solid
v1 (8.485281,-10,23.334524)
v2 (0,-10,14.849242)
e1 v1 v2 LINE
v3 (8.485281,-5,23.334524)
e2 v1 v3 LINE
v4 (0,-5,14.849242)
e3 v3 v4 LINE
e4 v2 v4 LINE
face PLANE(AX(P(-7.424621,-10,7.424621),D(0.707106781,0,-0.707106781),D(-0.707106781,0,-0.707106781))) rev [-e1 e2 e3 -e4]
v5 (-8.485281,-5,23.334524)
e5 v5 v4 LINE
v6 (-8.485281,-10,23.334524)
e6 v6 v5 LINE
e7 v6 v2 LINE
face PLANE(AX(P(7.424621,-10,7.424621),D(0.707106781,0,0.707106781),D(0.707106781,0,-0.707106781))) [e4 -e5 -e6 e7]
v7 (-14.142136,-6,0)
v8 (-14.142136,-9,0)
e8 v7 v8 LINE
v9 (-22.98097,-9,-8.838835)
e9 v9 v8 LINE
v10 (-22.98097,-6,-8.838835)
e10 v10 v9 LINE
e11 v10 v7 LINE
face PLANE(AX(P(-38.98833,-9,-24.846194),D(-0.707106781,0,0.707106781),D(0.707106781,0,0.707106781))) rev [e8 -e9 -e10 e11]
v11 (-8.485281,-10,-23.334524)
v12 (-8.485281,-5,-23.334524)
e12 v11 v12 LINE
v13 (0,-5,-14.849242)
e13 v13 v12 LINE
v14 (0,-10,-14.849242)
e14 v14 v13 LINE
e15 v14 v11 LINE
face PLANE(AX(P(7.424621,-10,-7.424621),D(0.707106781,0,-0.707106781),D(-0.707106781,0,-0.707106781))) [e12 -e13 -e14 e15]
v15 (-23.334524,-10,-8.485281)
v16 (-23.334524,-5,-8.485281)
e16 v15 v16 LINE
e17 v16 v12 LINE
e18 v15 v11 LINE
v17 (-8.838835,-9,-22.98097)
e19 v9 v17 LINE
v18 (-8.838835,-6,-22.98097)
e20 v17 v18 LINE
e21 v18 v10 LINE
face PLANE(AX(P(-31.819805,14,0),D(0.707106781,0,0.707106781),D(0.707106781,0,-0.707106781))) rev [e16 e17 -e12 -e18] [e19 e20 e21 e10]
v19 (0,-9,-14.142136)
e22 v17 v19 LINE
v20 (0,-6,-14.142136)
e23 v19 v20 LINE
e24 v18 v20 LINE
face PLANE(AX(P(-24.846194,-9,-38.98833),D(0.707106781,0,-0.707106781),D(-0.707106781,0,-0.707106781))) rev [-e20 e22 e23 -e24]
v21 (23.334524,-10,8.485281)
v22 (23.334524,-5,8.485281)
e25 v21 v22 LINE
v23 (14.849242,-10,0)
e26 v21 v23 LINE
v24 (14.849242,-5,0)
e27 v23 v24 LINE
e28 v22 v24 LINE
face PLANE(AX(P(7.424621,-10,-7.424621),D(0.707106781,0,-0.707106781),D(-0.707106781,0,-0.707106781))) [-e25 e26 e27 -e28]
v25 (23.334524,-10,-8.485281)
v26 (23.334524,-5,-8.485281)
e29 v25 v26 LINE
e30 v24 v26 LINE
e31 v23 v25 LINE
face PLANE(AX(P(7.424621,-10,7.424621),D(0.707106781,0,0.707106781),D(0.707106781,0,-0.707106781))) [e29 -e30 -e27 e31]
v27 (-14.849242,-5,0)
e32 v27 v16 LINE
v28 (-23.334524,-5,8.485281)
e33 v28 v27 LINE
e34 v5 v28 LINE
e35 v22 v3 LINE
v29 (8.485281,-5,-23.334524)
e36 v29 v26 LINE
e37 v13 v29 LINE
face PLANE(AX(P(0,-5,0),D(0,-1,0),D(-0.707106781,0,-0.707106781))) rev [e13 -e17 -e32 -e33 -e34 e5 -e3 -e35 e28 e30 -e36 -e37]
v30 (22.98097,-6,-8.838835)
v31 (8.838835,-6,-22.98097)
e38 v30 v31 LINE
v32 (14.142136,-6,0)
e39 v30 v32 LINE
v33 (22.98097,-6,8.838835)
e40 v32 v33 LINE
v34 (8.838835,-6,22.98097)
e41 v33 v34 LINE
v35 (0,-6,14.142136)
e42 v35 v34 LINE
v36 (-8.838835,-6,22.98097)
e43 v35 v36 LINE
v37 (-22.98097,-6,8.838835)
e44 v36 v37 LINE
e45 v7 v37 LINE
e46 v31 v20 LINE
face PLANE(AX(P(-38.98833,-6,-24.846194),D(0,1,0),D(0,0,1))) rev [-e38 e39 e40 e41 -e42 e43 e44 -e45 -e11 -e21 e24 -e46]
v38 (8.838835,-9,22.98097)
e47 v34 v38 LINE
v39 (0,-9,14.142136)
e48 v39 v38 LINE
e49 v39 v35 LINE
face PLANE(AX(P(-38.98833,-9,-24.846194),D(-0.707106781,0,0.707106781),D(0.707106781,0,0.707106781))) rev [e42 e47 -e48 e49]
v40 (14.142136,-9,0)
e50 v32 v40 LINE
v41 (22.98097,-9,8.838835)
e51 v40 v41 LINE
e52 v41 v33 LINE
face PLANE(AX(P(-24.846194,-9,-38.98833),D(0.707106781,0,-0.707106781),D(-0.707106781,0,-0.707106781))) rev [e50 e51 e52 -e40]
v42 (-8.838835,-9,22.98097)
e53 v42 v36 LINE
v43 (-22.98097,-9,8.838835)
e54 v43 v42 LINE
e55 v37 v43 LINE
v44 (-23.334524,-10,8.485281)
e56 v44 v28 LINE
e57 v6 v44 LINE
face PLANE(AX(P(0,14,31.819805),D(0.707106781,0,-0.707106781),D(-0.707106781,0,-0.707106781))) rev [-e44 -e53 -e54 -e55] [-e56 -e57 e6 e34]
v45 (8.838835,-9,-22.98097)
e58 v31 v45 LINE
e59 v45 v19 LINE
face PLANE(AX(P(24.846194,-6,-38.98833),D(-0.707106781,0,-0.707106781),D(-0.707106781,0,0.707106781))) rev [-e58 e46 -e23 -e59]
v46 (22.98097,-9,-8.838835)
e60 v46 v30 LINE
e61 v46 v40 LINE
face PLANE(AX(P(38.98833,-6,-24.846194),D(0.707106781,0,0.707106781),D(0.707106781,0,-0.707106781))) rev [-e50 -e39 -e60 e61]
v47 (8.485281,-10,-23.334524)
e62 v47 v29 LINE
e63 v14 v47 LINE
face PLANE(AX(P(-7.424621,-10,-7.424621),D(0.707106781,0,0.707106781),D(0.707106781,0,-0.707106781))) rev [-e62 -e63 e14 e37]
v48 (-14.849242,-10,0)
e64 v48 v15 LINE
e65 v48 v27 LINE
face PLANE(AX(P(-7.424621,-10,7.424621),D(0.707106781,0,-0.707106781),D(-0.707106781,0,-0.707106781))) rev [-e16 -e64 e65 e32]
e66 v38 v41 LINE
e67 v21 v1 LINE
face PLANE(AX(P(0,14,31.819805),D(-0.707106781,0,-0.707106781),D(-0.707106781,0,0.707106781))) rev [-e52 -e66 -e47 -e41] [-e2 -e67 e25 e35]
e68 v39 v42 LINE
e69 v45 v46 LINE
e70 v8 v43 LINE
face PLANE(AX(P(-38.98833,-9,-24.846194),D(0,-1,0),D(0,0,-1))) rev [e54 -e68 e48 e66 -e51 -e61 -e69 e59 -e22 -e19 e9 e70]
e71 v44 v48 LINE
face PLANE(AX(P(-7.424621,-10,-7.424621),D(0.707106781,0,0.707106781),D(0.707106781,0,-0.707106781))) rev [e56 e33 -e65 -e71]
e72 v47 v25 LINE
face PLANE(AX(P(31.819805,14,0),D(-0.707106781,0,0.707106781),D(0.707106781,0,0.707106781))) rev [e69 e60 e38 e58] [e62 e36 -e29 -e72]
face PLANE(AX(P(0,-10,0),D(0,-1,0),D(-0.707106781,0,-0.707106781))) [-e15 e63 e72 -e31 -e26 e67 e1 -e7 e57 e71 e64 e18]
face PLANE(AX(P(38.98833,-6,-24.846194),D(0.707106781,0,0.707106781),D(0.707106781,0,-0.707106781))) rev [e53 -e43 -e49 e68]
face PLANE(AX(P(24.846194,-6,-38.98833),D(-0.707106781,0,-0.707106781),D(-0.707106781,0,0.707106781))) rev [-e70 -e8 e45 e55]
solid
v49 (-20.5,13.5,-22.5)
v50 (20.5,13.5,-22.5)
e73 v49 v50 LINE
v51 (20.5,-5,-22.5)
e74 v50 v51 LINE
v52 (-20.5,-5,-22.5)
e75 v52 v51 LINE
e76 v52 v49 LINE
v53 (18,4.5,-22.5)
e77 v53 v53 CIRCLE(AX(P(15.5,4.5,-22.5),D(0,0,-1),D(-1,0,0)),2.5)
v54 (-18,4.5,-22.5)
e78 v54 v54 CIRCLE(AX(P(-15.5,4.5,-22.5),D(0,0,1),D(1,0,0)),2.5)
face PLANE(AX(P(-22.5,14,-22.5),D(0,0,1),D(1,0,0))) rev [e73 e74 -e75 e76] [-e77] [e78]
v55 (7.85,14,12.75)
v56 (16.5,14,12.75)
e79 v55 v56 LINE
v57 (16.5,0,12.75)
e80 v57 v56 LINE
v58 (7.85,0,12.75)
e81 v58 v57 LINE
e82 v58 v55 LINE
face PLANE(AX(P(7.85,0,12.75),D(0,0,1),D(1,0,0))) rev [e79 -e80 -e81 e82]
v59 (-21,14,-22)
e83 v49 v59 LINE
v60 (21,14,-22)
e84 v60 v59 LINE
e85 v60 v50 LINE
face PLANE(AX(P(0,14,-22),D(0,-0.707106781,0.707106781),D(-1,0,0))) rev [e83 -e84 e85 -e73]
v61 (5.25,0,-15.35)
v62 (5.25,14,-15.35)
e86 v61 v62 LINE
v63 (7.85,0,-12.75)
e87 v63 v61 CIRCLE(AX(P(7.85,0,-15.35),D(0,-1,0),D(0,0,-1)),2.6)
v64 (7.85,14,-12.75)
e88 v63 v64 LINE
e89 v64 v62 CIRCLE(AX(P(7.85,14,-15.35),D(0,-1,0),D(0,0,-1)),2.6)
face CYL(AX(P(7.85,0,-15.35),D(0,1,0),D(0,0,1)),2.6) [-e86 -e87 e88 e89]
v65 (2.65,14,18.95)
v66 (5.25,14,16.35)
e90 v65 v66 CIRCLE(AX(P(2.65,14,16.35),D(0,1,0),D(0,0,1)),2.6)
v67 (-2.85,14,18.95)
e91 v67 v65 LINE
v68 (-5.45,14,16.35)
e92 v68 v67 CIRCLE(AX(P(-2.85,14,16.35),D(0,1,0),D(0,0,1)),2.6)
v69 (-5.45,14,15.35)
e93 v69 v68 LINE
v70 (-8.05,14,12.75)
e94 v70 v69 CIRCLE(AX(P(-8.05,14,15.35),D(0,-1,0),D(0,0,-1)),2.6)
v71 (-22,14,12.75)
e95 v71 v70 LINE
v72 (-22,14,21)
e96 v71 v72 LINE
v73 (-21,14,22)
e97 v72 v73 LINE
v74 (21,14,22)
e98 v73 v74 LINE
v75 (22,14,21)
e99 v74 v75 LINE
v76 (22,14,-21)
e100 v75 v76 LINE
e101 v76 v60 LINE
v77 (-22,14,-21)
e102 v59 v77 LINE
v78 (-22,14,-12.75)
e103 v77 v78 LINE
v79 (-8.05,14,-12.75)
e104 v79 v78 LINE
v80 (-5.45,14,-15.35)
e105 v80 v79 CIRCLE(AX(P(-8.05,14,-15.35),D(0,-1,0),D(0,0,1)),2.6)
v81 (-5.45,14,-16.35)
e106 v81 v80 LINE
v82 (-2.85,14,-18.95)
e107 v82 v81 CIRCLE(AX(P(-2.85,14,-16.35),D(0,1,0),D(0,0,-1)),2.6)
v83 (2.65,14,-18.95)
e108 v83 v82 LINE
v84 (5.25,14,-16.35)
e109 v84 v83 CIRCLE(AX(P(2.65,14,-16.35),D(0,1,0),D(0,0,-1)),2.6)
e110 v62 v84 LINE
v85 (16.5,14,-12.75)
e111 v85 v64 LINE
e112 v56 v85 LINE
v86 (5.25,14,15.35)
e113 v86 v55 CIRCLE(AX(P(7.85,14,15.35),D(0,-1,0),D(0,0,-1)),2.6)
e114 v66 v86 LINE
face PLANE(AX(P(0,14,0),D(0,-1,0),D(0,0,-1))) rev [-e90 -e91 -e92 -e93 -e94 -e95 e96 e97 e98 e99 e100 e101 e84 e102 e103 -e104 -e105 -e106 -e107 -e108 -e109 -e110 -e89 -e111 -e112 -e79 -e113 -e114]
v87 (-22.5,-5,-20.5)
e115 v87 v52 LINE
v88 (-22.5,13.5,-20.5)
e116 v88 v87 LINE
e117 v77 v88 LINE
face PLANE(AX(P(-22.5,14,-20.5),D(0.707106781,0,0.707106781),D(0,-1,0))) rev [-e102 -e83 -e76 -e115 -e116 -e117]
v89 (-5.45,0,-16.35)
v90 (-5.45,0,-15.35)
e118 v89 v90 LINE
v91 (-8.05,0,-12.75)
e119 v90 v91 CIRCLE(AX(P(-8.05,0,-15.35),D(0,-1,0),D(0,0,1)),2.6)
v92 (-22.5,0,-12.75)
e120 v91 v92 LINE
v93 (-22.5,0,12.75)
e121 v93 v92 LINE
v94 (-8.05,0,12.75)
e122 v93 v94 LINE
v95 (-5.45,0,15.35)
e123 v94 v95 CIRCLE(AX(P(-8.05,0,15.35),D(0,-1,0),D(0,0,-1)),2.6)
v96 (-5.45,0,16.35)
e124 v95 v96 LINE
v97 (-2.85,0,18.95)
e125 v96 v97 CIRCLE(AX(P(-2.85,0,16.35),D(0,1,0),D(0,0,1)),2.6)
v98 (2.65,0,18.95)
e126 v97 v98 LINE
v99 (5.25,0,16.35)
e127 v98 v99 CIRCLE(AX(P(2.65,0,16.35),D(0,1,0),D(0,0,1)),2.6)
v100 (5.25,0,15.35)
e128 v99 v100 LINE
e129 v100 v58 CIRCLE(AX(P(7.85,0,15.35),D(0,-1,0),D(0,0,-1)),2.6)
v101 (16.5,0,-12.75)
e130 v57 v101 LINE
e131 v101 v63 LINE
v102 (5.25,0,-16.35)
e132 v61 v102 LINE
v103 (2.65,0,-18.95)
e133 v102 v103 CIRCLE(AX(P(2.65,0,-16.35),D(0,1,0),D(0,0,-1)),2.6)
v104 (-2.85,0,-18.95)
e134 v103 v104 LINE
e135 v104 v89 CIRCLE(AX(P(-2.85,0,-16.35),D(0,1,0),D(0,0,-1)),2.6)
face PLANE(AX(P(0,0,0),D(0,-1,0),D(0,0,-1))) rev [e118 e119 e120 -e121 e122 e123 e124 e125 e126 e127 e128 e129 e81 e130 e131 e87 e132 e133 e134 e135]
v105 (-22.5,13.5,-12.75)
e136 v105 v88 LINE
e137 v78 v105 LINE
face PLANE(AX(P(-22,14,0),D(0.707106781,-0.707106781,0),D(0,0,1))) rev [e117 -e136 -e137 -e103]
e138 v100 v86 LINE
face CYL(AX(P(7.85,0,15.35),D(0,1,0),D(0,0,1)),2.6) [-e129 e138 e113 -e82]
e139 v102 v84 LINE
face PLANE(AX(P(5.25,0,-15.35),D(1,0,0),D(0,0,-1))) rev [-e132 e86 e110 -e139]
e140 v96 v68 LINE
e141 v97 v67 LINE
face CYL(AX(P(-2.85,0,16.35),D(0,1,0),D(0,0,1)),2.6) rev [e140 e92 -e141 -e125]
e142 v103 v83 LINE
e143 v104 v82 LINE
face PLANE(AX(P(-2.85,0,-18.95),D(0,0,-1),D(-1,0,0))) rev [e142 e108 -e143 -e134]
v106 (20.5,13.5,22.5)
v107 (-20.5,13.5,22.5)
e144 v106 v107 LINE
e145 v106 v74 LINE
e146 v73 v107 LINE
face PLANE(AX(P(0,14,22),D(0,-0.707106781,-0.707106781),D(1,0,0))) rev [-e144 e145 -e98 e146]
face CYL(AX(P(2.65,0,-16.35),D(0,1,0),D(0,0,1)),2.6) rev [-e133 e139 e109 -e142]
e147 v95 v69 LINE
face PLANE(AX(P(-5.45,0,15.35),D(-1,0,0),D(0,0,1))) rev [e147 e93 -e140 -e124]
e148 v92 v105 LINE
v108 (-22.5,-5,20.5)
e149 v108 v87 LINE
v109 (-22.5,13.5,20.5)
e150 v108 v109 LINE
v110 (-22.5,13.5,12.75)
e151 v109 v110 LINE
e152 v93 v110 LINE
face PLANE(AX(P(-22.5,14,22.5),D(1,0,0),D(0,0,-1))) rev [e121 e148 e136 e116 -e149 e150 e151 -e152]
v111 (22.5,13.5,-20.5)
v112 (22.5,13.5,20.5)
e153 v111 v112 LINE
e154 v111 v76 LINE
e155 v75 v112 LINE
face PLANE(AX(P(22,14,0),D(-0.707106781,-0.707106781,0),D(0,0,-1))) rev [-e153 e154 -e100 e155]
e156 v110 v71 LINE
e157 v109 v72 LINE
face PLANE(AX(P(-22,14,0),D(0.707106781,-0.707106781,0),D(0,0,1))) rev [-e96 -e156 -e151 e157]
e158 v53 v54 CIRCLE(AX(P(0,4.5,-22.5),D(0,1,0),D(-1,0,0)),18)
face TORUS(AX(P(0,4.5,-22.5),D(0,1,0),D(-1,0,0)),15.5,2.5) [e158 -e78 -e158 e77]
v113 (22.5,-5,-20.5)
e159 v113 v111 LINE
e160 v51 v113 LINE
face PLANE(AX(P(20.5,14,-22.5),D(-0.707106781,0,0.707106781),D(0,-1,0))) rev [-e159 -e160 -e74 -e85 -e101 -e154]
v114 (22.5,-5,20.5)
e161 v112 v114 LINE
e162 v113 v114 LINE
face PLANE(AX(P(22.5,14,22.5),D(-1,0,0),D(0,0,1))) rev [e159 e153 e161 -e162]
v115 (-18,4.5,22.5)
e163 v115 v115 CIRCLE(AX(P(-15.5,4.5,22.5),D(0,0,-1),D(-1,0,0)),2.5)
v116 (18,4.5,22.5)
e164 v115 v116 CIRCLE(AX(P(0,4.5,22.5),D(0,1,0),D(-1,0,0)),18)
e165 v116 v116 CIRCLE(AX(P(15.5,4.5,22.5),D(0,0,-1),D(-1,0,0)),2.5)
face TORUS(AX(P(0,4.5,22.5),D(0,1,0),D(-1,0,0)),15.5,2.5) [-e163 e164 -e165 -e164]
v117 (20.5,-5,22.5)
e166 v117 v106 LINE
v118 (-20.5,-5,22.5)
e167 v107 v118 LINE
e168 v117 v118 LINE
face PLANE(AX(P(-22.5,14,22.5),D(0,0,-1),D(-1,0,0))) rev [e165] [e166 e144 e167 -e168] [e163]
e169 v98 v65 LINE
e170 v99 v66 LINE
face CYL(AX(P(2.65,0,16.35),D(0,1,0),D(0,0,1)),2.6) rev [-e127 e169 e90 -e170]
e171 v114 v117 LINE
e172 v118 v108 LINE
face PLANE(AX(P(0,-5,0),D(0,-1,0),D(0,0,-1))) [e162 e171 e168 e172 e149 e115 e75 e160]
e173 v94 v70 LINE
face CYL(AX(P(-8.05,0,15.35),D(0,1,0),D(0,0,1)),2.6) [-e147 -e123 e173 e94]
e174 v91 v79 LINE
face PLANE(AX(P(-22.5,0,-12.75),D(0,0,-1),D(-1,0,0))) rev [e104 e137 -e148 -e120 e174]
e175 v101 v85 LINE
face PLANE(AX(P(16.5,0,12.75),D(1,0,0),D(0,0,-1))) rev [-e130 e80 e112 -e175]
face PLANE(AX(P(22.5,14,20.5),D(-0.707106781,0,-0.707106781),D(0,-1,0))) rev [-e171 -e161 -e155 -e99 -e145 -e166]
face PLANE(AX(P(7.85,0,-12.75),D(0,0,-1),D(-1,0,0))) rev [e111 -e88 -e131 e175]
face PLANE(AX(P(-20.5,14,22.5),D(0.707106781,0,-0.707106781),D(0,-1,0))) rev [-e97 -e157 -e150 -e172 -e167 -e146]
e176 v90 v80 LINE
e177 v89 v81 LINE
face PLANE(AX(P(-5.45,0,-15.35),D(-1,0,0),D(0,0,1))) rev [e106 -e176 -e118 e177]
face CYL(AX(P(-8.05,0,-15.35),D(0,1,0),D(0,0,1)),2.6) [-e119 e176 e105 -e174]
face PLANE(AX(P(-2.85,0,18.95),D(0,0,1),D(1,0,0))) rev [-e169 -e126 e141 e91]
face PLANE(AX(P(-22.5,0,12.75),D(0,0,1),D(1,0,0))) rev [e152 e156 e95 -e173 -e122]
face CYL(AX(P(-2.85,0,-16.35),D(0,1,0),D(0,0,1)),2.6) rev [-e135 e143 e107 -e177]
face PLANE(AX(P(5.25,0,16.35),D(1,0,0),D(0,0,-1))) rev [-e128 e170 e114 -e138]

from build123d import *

# Parameters (mm, degrees)
SKETCH1_W             = 45
SKETCH1_H             = 45
BOSS_EXTRUDE1_DEPTH   = 14
CUT_EXTRUDE1_DEPTH    = 35.763486592
CHAMFER1_SIZE         = 0.5
CHAMFER2_SIZE         = 2
SKETCH4_R             = 1.75
CUT_EXTRUDE2_DEPTH    = 35.763486592
SKETCH5_R             = 1.75
SKETCH5_W             = 41
SKETCH5_H             = 2
SKETCH5_W_2           = 2
SKETCH5_H_2           = 41
BOSS_EXTRUDE3_DEPTH   = 5
SKETCH6_R             = 1.75
BOSS_EXTRUDE4_DEPTH   = 19
REVOLVE4_OUTLINE_R    = 2.5
REVOLVE4_ANGLE        = 180
SKETCH27_W            = 21
SKETCH27_H            = 12
SKETCH27_W_2          = 12
SKETCH27_H_2          = 21
BOSS_EXTRUDE6_DEPTH   = 5
BODY_MOVE_COPY1_ANGLE = 45
SKETCH31_W            = 20
SKETCH31_H            = 3
CUT_EXTRUDE5_DEPTH    = 71.129894544
SKETCH33_W            = 20
SKETCH33_H            = 3
CUT_EXTRUDE6_DEPTH    = 71.129894544


# Read off the part's stored shape, not the designer's step: Revolve4, Split1
with BuildPart() as part:
    # Sketch1 → Boss-Extrude1 (new body)
    with BuildSketch(Plane(origin=(0, 0, 0), x_dir=(1, 0, 0), z_dir=(0, 1, 0))):
        Rectangle(SKETCH1_W, SKETCH1_H)
    extrude(amount=BOSS_EXTRUDE1_DEPTH)

    # Sketch3 → Cut-Extrude1 (cut, through all)
    with BuildSketch(Plane(origin=(0, 14, 0), x_dir=(1, 0, 0), z_dir=(0, 1, 0))):
        with BuildLine():
            Line((-22.5, 12.75), (-8.05, 12.75))
            ThreePointArc((-8.05, 12.75), (-6.211522369, 13.511522369), (-5.45, 15.35))
            Line((-5.45, 15.35), (-5.45, 16.35))
            ThreePointArc((-5.45, 16.35), (-4.688477631, 18.188477631), (-2.85, 18.95))
            Line((-2.85, 18.95), (2.65, 18.95))
            ThreePointArc((2.65, 18.95), (4.488477631, 18.188477631), (5.25, 16.35))
            Line((5.25, 16.35), (5.25, 15.35))
            ThreePointArc((5.25, 15.35), (6.011522369, 13.511522369), (7.85, 12.75))
            Line((7.85, 12.75), (16.5, 12.75))
            Line((16.5, 12.75), (16.5, -12.75))
            Line((16.5, -12.75), (7.85, -12.75))
            ThreePointArc((7.85, -12.75), (6.011522369, -13.511522369), (5.25, -15.35))
            Line((5.25, -15.35), (5.25, -16.35))
            ThreePointArc((5.25, -16.35), (4.488477631, -18.188477631), (2.65, -18.95))
            Line((2.65, -18.95), (-2.85, -18.95))
            ThreePointArc((-2.85, -18.95), (-4.688477631, -18.188477631), (-5.45, -16.35))
            Line((-5.45, -16.35), (-5.45, -15.35))
            ThreePointArc((-5.45, -15.35), (-6.211522369, -13.511522369), (-8.05, -12.75))
            Line((-8.05, -12.75), (-22.5, -12.75))
            Line((-22.5, -12.75), (-22.5, 12.75))
        make_face()
    extrude(amount=-CUT_EXTRUDE1_DEPTH, mode=Mode.SUBTRACT)

    # Chamfer1
    chamfer1_edges = [part.edges().sort_by_distance(p)[0] for p in [
        (-22.5, 14, -17.625),
        (0, 14, 22.5),
        (-22.5, 14, 17.625),
        (22.5, 14, 0),
        (0, 14, -22.5),
    ]]
    chamfer(chamfer1_edges, length=CHAMFER1_SIZE)

    # Chamfer2
    # the kernel refuses this chamfer: 5.464101615, 2 mm, written as the material it takes off along each edge
    # the kernel refuses this chamfer: 5.464101615, 2 mm, written as the material it takes off along each edge
    with BuildSketch(Plane(origin=(-22.5, -5.143365976, -22.5), x_dir=(-0.027495876610585647, 0, 0.9996219169112968), z_dir=(0, 1, 0)), Plane(origin=(-22.5, -5.143365976, 22.5), x_dir=(0.9996219169112968, 0, 0.027495876610585647), z_dir=(0, 1, 0))) as chamfer2_2_piece_1:
        Polygon((CHAMFER2_SIZE * 0.999621916911, CHAMFER2_SIZE * 0.0274958766106), (-CHAMFER2_SIZE * 0.0274958766106, CHAMFER2_SIZE * 0.999621916911), (0, 0), align=None)
    extrude(amount=23.786731952, mode=Mode.SUBTRACT)
    with BuildSketch(Plane(origin=(22.5, -5.143365976, 22.5), x_dir=(-0.9996219169112968, 0, 0.027495876610585647), z_dir=(0, 1, 0)), Plane(origin=(22.5, -5.143365976, -22.5), x_dir=(0.027495876610585647, 0, 0.9996219169112968), z_dir=(0, 1, 0))) as chamfer2_2_piece_2:
        Polygon((CHAMFER2_SIZE * 0.999621916911, -CHAMFER2_SIZE * 0.0274958766106), (-CHAMFER2_SIZE * 0.0274958766106, -CHAMFER2_SIZE * 0.999621916911), (0, 0), align=None)
    extrude(amount=23.786731952, mode=Mode.SUBTRACT)

    # Sketch4 → Cut-Extrude2 (cut, through all)
    with BuildSketch(Plane(origin=(0, 14, 0), x_dir=(1, 0, 0), z_dir=(0, 1, 0))):
        with Locations(Location((-18, 17.25, 0), (0, 0, 270))):
            Circle(SKETCH4_R)
        with Locations(Location((18, 17.25, 0), (0, 0, 270))):
            Circle(SKETCH4_R)
        with Locations(Location((18, -17.25, 0), (0, 0, 270))):
            Circle(SKETCH4_R)
        with Locations(Location((-18, -17.25, 0), (0, 0, 270))):
            Circle(SKETCH4_R)
    extrude(amount=-CUT_EXTRUDE2_DEPTH, mode=Mode.SUBTRACT)

    # Sketch5 → Boss-Extrude3 (add)
    # profile 1 of 7: a face of its own
    with BuildSketch(Plane.XZ):
        with BuildLine():
            Line((20.5, 20.5), (20.5, -22.5))
            Line((20.5, -22.5), (-20.5, -22.5))
            Line((-20.5, -22.5), (-22.5, -20.5))
            Line((-22.5, -20.5), (-22.5, -12.75))
            Line((-22.5, -12.75), (-8.05, -12.75))
            ThreePointArc((-8.05, -12.75), (-6.211522369, -13.511522369), (-5.45, -15.35))
            Line((-5.45, -15.35), (-5.45, -16.35))
            ThreePointArc((-5.45, -16.35), (-4.688477631, -18.188477631), (-2.85, -18.95))
            Line((-2.85, -18.95), (2.65, -18.95))
            ThreePointArc((2.65, -18.95), (4.488477631, -18.188477631), (5.25, -16.35))
            Line((5.25, -16.35), (5.25, -15.35))
            ThreePointArc((5.25, -15.35), (6.011522369, -13.511522369), (7.85, -12.75))
            Line((7.85, -12.75), (16.5, -12.75))
            Line((16.5, -12.75), (16.5, 12.75))
            Line((16.5, 12.75), (7.85, 12.75))
            ThreePointArc((7.85, 12.75), (6.011522369, 13.511522369), (5.25, 15.35))
            Line((5.25, 15.35), (5.25, 16.35))
            ThreePointArc((5.25, 16.35), (4.488477631, 18.188477631), (2.65, 18.95))
            Line((2.65, 18.95), (-2.85, 18.95))
            ThreePointArc((-2.85, 18.95), (-4.688477631, 18.188477631), (-5.45, 16.35))
            Line((-5.45, 16.35), (-5.45, 15.35))
            ThreePointArc((-5.45, 15.35), (-6.211522369, 13.511522369), (-8.05, 12.75))
            Line((-8.05, 12.75), (-22.5, 12.75))
            Line((-22.5, 12.75), (-22.5, 20.5))
            Line((-22.5, 20.5), (20.5, 20.5))
        make_face()
        with Locations(Location((18, 17.25, 0), (0, 0, 90))):
            Circle(SKETCH5_R, mode=Mode.SUBTRACT)
        with Locations(Location((-18, -17.25, 0), (0, 0, 90))):
            Circle(SKETCH5_R, mode=Mode.SUBTRACT)
        with Locations(Location((18, -17.25, 0), (0, 0, 90))):
            Circle(SKETCH5_R, mode=Mode.SUBTRACT)
        with Locations(Location((-18, 17.25, 0), (0, 0, 90))):
            Circle(SKETCH5_R, mode=Mode.SUBTRACT)
    # profile 2 of 7: a face of its own
    with BuildSketch(Plane.XZ):
        with Locations((0, 21.5)):
            Rectangle(SKETCH5_W, SKETCH5_H)
    # profile 3 of 7: a face of its own
    with BuildSketch(Plane.XZ):
        Polygon((-22.5, 20.5), (-20.5, 20.5), (-20.5, 22.5), align=None)
    # profile 4 of 7: a face of its own
    with BuildSketch(Plane.XZ):
        Polygon((22.5, 20.5), (20.5, 20.5), (20.5, 22.5), align=None)
    # profile 5 of 7: a face of its own
    with BuildSketch(Plane.XZ):
        with Locations((21.5, 0)):
            Rectangle(SKETCH5_W_2, SKETCH5_H_2)
    # profile 6 of 7: a face of its own
    with BuildSketch(Plane.XZ):
        Polygon((20.5, -20.5), (20.5, -22.5), (22.5, -20.5), align=None)
    # profile 7 of 7: a face of its own
    with BuildSketch(Plane.XZ):
        with BuildLine():
            Line((-22.5, 12.75), (-22.5, -12.75))
            Line((-22.5, -12.75), (-8.05, -12.75))
            ThreePointArc((-8.05, -12.75), (-6.211522369, -13.511522369), (-5.45, -15.35))
            Line((-5.45, -15.35), (-5.45, -16.35))
            ThreePointArc((-5.45, -16.35), (-4.688477631, -18.188477631), (-2.85, -18.95))
            Line((-2.85, -18.95), (2.65, -18.95))
            ThreePointArc((2.65, -18.95), (4.488477631, -18.188477631), (5.25, -16.35))
            Line((5.25, -16.35), (5.25, -15.35))
            ThreePointArc((5.25, -15.35), (6.011522369, -13.511522369), (7.85, -12.75))
            Line((7.85, -12.75), (16.5, -12.75))
            Line((16.5, -12.75), (16.5, 12.75))
            Line((16.5, 12.75), (7.85, 12.75))
            ThreePointArc((7.85, 12.75), (6.011522369, 13.511522369), (5.25, 15.35))
            Line((5.25, 15.35), (5.25, 16.35))
            ThreePointArc((5.25, 16.35), (4.488477631, 18.188477631), (2.65, 18.95))
            Line((2.65, 18.95), (-2.85, 18.95))
            ThreePointArc((-2.85, 18.95), (-4.688477631, 18.188477631), (-5.45, 16.35))
            Line((-5.45, 16.35), (-5.45, 15.35))
            ThreePointArc((-5.45, 15.35), (-6.211522369, 13.511522369), (-8.05, 12.75))
            Line((-8.05, 12.75), (-22.5, 12.75))
        make_face()
    extrude(amount=BOSS_EXTRUDE3_DEPTH)

    # Sketch6 → Boss-Extrude4 (add)
    with BuildSketch(Plane(origin=(0, 14, 0), x_dir=(1, 0, 0), z_dir=(0, 1, 0))):
        with Locations((-18, 17.25)):
            Circle(SKETCH6_R)
        with Locations((18, 17.25)):
            Circle(SKETCH6_R)
        with Locations((-18, -17.25)):
            Circle(SKETCH6_R)
        with Locations((18, -17.25)):
            Circle(SKETCH6_R)
    extrude(amount=-BOSS_EXTRUDE4_DEPTH)

    # Revolve4 outline → Revolve4 (revolve)
    with BuildSketch(Plane(origin=(0, 0, 22.5), x_dir=(-1, 0, 0), z_dir=(0, 0, -1))):
        with Locations((15.5, 4.5)):
            Circle(REVOLVE4_OUTLINE_R)
    revolve4 = revolve(axis=Axis((0, 0, 22.5), (0, 1, 0)), revolution_arc=REVOLVE4_ANGLE)

    # Mirror1: Revolve4 across plane
    add(revolve4.mirror(Plane.XY))

    # Sketch27 → Boss-Extrude6 (add)
    with BuildSketch(Plane.XZ.offset(5)):
        with Locations((0, 16.5)):
            Rectangle(SKETCH27_W, SKETCH27_H)
        with Locations((-16.5, 0)):
            Rectangle(SKETCH27_W_2, SKETCH27_H_2)
        Rectangle(SKETCH27_W, SKETCH27_H_2)
        with Locations((16.5, 0)):
            Rectangle(SKETCH27_W_2, SKETCH27_H_2)
        with Locations((0, -16.5)):
            Rectangle(SKETCH27_W, SKETCH27_H)
    extrude(amount=BOSS_EXTRUDE6_DEPTH)


with BuildPart() as body_2:
    # Split1: the piece on the far side of the plane
    add(part.part)
    split(bisect_by=Plane(origin=(0, -5, 0), x_dir=(1, 0, 0), z_dir=(0, 1, 0)), keep=Keep.BOTTOM)


with BuildPart() as part_1:
    add(part.part)

    # Split1
    split(bisect_by=Plane(origin=(0, -5, 0), x_dir=(1, 0, 0), z_dir=(0, 1, 0)), keep=Keep.TOP)


with BuildPart() as body_2_1:
    # Body-Move/Copy1: moved
    add(body_2.part.rotate(Axis((0, 0, 0), (0, 1, 0)), BODY_MOVE_COPY1_ANGLE))

    # Sketch31 → Cut-Extrude5 (cut, through all)
    with BuildSketch(Plane(origin=(15.909902577, 0, 15.909902577), x_dir=(0.7071067811864872, 0, -0.707106781186608), z_dir=(0.707106781186608, 0, 0.7071067811864872))):
        with Locations((0, -7.5)):
            Rectangle(SKETCH31_W, SKETCH31_H)
    extrude(amount=-CUT_EXTRUDE5_DEPTH, mode=Mode.SUBTRACT)

    # Sketch33 → Cut-Extrude6 (cut, through all)
    with BuildSketch(Plane(origin=(-15.909902577, 0, 15.909902577), x_dir=(0.707106781186608, 0, 0.7071067811864872), z_dir=(-0.7071067811864872, 0, 0.707106781186608))):
        with Locations((0, -7.5)):
            Rectangle(SKETCH33_W, SKETCH33_H)
    extrude(amount=-CUT_EXTRUDE6_DEPTH, mode=Mode.SUBTRACT)


solid = Compound([part_1.part, body_2_1.part])
